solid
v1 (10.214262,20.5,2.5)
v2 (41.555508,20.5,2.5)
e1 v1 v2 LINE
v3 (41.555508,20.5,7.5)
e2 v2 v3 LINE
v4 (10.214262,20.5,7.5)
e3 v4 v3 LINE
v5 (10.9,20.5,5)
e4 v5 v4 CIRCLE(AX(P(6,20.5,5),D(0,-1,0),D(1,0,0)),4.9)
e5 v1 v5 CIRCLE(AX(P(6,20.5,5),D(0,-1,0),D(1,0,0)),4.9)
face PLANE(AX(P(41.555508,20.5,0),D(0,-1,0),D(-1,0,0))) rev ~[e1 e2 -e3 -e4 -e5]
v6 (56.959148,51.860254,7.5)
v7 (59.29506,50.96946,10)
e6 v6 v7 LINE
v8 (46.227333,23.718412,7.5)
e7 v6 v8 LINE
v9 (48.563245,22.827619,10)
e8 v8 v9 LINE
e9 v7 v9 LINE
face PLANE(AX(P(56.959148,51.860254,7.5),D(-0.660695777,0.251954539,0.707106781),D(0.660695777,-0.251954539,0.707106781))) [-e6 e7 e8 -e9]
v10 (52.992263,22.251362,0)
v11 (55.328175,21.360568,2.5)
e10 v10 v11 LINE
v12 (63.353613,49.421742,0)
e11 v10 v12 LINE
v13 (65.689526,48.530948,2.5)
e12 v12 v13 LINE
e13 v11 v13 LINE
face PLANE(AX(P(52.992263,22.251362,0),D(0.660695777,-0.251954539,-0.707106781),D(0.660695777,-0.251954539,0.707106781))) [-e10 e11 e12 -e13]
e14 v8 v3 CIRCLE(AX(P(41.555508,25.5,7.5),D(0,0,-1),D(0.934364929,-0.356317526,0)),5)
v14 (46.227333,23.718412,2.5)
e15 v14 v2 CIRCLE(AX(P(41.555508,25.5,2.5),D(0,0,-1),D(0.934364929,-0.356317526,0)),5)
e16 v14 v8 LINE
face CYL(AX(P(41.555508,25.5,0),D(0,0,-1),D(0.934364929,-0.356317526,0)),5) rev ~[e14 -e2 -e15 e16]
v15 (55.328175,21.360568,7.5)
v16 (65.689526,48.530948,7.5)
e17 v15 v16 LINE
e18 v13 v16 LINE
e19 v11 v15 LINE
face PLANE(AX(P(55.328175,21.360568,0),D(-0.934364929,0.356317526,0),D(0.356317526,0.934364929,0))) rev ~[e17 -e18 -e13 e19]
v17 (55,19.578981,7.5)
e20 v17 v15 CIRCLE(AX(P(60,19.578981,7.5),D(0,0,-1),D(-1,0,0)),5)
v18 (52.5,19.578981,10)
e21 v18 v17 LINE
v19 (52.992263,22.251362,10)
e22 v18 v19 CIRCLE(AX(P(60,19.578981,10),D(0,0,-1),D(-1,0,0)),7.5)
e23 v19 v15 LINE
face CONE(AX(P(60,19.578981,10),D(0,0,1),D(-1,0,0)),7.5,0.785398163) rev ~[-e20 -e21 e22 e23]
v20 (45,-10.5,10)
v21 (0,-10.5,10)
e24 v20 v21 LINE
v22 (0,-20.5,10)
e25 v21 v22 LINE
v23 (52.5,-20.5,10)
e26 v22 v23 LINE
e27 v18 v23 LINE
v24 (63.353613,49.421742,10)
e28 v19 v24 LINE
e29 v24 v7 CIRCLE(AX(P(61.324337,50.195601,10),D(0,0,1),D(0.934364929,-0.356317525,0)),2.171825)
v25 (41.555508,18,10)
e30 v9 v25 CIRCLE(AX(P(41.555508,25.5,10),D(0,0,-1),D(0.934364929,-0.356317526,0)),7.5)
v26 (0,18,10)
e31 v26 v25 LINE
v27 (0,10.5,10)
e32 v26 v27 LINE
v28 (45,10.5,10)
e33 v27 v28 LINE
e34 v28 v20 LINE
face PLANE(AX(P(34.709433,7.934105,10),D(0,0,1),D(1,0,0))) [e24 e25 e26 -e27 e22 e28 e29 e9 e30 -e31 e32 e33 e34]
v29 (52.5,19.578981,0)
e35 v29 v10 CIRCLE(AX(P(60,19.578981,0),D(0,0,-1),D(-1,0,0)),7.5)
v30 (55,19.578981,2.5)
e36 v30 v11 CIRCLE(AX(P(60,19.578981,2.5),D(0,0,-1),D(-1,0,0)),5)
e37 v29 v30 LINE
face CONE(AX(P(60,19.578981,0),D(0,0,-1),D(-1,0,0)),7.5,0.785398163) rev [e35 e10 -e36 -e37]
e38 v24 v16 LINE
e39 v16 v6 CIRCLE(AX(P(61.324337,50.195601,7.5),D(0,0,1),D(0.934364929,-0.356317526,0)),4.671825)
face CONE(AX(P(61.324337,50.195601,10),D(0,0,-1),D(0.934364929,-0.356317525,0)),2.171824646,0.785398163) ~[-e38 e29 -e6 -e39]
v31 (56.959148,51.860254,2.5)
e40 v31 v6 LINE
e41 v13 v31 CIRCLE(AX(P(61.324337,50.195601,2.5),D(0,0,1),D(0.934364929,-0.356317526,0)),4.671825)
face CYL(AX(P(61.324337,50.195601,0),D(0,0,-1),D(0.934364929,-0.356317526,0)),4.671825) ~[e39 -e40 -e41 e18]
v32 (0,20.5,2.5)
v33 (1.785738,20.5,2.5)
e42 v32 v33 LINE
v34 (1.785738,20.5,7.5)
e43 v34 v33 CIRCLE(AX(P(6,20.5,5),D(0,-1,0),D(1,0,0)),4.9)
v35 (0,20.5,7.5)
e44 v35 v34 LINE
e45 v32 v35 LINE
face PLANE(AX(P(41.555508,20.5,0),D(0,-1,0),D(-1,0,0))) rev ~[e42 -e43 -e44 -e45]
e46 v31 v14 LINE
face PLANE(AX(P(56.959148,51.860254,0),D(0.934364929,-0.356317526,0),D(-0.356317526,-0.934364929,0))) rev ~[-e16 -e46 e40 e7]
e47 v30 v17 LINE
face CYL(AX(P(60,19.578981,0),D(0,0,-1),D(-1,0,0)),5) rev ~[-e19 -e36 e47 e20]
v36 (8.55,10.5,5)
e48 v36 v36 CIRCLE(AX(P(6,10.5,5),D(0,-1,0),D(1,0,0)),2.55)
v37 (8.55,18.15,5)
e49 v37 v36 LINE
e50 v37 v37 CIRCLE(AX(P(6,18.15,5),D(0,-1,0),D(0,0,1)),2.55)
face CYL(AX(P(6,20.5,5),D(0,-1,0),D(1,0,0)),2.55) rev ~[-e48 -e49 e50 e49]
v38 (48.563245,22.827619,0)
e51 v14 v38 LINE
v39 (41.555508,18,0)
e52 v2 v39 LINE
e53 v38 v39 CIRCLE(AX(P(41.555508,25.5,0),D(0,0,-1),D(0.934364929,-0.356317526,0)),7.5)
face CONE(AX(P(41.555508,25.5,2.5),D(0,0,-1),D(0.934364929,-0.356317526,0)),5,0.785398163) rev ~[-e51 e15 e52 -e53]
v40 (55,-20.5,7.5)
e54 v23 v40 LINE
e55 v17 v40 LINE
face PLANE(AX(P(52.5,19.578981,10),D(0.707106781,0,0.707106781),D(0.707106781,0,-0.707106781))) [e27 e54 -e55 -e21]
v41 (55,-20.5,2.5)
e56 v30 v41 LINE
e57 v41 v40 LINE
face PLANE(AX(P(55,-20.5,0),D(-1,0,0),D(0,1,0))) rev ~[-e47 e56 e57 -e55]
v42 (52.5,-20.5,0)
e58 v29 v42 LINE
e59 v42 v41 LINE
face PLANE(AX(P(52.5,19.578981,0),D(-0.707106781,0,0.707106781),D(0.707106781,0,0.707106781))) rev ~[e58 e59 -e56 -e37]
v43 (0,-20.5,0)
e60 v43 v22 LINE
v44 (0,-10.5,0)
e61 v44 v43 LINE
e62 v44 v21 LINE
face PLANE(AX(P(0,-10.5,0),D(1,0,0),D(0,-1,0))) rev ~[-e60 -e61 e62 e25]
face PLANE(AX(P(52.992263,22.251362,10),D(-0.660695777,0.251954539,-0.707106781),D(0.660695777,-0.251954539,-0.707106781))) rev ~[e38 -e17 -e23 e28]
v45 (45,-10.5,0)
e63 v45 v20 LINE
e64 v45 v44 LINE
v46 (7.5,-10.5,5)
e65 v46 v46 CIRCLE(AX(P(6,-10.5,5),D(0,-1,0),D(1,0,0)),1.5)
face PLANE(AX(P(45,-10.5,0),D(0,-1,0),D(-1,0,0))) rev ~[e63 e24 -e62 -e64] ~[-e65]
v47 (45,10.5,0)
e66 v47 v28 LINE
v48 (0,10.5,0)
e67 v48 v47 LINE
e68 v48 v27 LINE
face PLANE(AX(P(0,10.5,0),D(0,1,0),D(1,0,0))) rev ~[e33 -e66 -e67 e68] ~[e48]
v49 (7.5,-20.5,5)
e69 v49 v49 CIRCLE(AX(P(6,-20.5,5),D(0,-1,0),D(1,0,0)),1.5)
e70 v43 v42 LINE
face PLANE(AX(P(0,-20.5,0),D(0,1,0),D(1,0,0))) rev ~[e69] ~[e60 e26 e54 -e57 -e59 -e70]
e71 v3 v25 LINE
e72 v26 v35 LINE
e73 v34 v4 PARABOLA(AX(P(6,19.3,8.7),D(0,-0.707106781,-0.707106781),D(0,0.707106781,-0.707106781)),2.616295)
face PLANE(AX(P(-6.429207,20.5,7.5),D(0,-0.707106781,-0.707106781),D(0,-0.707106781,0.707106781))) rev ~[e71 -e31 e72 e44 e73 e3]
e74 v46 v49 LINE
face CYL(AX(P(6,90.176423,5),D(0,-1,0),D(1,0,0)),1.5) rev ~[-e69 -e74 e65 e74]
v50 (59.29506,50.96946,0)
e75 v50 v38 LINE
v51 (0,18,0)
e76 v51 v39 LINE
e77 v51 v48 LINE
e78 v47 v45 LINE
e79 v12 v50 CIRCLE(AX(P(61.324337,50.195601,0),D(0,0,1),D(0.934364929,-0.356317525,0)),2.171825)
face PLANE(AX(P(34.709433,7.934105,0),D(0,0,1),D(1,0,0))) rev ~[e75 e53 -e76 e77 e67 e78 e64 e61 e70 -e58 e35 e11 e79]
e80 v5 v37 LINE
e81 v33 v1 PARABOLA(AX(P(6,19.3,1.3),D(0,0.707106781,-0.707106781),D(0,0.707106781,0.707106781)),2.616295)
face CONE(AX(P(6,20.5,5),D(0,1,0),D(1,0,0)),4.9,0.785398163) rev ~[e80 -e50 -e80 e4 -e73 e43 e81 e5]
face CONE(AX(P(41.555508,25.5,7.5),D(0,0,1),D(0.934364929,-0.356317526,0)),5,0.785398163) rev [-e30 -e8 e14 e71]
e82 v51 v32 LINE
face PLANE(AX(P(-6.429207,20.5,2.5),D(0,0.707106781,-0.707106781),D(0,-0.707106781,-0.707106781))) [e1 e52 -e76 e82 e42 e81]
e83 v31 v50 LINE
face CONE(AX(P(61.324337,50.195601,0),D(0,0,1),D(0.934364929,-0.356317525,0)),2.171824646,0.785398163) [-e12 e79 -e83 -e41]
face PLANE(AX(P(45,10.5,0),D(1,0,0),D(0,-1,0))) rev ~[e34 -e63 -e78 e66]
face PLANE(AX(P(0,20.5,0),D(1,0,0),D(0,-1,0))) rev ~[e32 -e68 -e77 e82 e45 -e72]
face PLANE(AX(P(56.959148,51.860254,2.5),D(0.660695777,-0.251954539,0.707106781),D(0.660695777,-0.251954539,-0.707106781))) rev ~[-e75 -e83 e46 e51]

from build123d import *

# Parameters (mm, degrees)
F1_DEPTH       = 10
F3_D           = 5.1
F3_DEPTH       = 20
F3_CSINK_D     = 9.8
F3_CSINK_ANGLE = 90
F3_TIP         = 1.5321945785
F5_D           = 3
F6_T1_DEPTH    = 29.0789805985
F6_T3_DEPTH    = 30.1186834219
F6_T5_DEPTH    = 47.9847156333
F6_T7_DEPTH    = 46.5081880684
F6_T10_ANGLE   = 180
F6_T12_ANGLE   = 180
F6_T14_ANGLE   = 69.1257858818
F6_T16_ANGLE   = 20.8742141182
F6_T18_ANGLE   = 69.1257858818
F6_T20_ANGLE   = 20.8742141182


# Not quite as in the source:
# - a fillet or chamfer that OpenCascade refuses, or shapes differently, is made with other operations: its cross-section is extruded or revolved along the edge and cut away or added


with BuildPart() as f1:
    # F0 (on Top) → F1 (new body)
    with BuildSketch(Plane.XY):
        with BuildLine():
            Line((41.5555081634, 20.5), (0, 20.5))
            Line((0, 20.5), (0, 10.5))
            Line((0, 10.5), (45, 10.5))
            Line((45, 10.5), (45, -10.5))
            Line((45, -10.5), (0, -10.5))
            Line((0, -10.5), (0, -20.5))
            Line((0, -20.5), (45, -20.5))
            Line((45, -20.5), (55, -20.5))
            Line((55, -20.5), (55, 19.5789805985))
            ThreePointArc((55, 19.5789805985), (55.0827282347, 20.4847611382), (55.3281753544, 21.3605682278))
            Line((55.3281753544, 21.3605682278), (65.6895257755, 48.5309478737))
            ThreePointArc((65.6895257755, 48.5309478737), (62.9889896705, 54.5607899764), (56.9591475677, 51.8602538715))
            Line((56.9591475677, 51.8602538715), (46.227332809, 23.7184123708))
            ThreePointArc((46.227332809, 23.7184123708), (44.3920608118, 21.382480228), (41.5555081634, 20.5))
        make_face()
    extrude(amount=F1_DEPTH)

    # F3
    with Locations(Plane(origin=(0, 20.5, 0), x_dir=(-1, 0, 0), z_dir=(0, 1, 0))):
        with Locations((-6, 5)):
            CounterSinkHole(F3_D / 2, F3_CSINK_D / 2, depth=F3_DEPTH, counter_sink_angle=F3_CSINK_ANGLE)
            with Locations((0, 0, -(F3_DEPTH + F3_TIP / 2))):  # 118° drill point
                Cone(0, F3_D / 2, F3_TIP, mode=Mode.SUBTRACT)

    # F5 (through all)
    with Locations(Plane(origin=(0, -10.5, 0), x_dir=(-1, 0, 0), z_dir=(0, 1, 0))):
        with Locations((-6, 5)):
            Hole(F5_D / 2)

    # F6: chamfer of 2.5 on 4 edges, made by hand

    # F6_s2 → F6_t1 (cut)
    with BuildSketch(Plane(origin=(14.1361725075, 37.0690265418, 0), x_dir=(0, 0, 1), z_dir=(0.3563175258, 0.9343649291, 0))):
        Polygon((10, 41.5855618218), (7.5, 44.0855618218), (10, 44.0855618218), align=None)
        Polygon((0, 41.5855618218), (2.5, 44.0855618218), (0, 44.0855618218), align=None)
    extrude(amount=F6_T1_DEPTH, mode=Mode.SUBTRACT)

    # F6_s4 → F6_t3 (cut)
    with BuildSketch(Plane(origin=(24.4975229285, 64.2394061877, 0), x_dir=(0, 0, 1), z_dir=(-0.3563175258, -0.9343649291, 0))):
        Polygon((7.5, -34.7419125306), (10, -37.2419125306), (10, -34.7419125306), align=None)
        Polygon((2.5, -34.7419125306), (0, -37.2419125306), (0, -34.7419125306), align=None)
    extrude(amount=F6_T3_DEPTH, mode=Mode.SUBTRACT)

    # F6_s6 → F6_t5 (cut)
    with BuildSketch(Plane.YZ.offset(-6.4292074699)):
        Polygon((20.5, 7.5), (18, 10), (20.5, 10), align=None)
        Polygon((20.5, 2.5), (18, 0), (20.5, 0), align=None)
    extrude(amount=F6_T5_DEPTH, mode=Mode.SUBTRACT)

    # F6_s8 → F6_t7 (cut)
    with BuildSketch(Plane.XZ.offset(-19.5789805985)):
        Polygon((52.5, 10), (55, 7.5), (55, 10), align=None)
        Polygon((52.5, 0), (55, 2.5), (55, 0), align=None)
    extrude(amount=F6_T7_DEPTH, mode=Mode.SUBTRACT)

    # F6_s9 → F6_t10 (revolve, cut)
    with BuildSketch(Plane(origin=(24.4975229285, 64.2394061877, 0), x_dir=(0, 0, 1), z_dir=(-0.3563175258, -0.9343649291, 0))):
        Polygon((0, -41.5855618218), (2.5, -44.0855618218), (0, -44.0855618218), align=None)
    revolve(axis=Axis((61.3243366716, 50.1956008726, 0), (0, 0, 1)), revolution_arc=F6_T10_ANGLE, mode=Mode.SUBTRACT)

    # F6_s11 → F6_t12 (revolve, cut)
    with BuildSketch(Plane(origin=(24.4975229285, 64.2394061877, 0), x_dir=(0, 0, 1), z_dir=(-0.3563175258, -0.9343649291, 0))):
        Polygon((10, -41.5855618218), (7.5, -44.0855618218), (10, -44.0855618218), align=None)
    revolve(axis=Axis((61.3243366716, 50.1956008726, 10), (0, 0, 1)), revolution_arc=F6_T12_ANGLE, mode=Mode.SUBTRACT)

    # F6_s13 → F6_t14 (revolve, cut)
    with BuildSketch(Plane(origin=(13.7657081698, 36.0975646869, 0), x_dir=(0, 0, 1), z_dir=(0.3563175258, 0.9343649291, 0))):
        Polygon((7.5, 34.7419125306), (10, 37.2419125306), (10, 34.7419125306), align=None)
    revolve(axis=Axis((41.5555081634, 25.5, 10), (0, 0, -1)), revolution_arc=F6_T14_ANGLE, mode=Mode.SUBTRACT)

    # F6_s15 → F6_t16 (revolve, cut)
    with BuildSketch(Plane.XZ.offset(-19.5789805985)):
        Polygon((52.5, 10), (55, 7.5), (55, 10), align=None)
    revolve(axis=Axis((60, 19.5789805985, 10), (0, 0, -1)), revolution_arc=F6_T16_ANGLE, mode=Mode.SUBTRACT)

    # F6_s17 → F6_t18 (revolve, cut)
    with BuildSketch(Plane(origin=(13.7657081698, 36.0975646869, 0), x_dir=(0, 0, 1), z_dir=(0.3563175258, 0.9343649291, 0))):
        Polygon((2.5, 34.7419125306), (0, 37.2419125306), (0, 34.7419125306), align=None)
    revolve(axis=Axis((41.5555081634, 25.5, 0), (0, 0, -1)), revolution_arc=F6_T18_ANGLE, mode=Mode.SUBTRACT)

    # F6_s19 → F6_t20 (revolve, cut)
    with BuildSketch(Plane.XZ.offset(-19.5789805985)):
        Polygon((52.5, 0), (55, 2.5), (55, 0), align=None)
    revolve(axis=Axis((60, 19.5789805985, 0), (0, 0, -1)), revolution_arc=F6_T20_ANGLE, mode=Mode.SUBTRACT)


solid = f1.part
